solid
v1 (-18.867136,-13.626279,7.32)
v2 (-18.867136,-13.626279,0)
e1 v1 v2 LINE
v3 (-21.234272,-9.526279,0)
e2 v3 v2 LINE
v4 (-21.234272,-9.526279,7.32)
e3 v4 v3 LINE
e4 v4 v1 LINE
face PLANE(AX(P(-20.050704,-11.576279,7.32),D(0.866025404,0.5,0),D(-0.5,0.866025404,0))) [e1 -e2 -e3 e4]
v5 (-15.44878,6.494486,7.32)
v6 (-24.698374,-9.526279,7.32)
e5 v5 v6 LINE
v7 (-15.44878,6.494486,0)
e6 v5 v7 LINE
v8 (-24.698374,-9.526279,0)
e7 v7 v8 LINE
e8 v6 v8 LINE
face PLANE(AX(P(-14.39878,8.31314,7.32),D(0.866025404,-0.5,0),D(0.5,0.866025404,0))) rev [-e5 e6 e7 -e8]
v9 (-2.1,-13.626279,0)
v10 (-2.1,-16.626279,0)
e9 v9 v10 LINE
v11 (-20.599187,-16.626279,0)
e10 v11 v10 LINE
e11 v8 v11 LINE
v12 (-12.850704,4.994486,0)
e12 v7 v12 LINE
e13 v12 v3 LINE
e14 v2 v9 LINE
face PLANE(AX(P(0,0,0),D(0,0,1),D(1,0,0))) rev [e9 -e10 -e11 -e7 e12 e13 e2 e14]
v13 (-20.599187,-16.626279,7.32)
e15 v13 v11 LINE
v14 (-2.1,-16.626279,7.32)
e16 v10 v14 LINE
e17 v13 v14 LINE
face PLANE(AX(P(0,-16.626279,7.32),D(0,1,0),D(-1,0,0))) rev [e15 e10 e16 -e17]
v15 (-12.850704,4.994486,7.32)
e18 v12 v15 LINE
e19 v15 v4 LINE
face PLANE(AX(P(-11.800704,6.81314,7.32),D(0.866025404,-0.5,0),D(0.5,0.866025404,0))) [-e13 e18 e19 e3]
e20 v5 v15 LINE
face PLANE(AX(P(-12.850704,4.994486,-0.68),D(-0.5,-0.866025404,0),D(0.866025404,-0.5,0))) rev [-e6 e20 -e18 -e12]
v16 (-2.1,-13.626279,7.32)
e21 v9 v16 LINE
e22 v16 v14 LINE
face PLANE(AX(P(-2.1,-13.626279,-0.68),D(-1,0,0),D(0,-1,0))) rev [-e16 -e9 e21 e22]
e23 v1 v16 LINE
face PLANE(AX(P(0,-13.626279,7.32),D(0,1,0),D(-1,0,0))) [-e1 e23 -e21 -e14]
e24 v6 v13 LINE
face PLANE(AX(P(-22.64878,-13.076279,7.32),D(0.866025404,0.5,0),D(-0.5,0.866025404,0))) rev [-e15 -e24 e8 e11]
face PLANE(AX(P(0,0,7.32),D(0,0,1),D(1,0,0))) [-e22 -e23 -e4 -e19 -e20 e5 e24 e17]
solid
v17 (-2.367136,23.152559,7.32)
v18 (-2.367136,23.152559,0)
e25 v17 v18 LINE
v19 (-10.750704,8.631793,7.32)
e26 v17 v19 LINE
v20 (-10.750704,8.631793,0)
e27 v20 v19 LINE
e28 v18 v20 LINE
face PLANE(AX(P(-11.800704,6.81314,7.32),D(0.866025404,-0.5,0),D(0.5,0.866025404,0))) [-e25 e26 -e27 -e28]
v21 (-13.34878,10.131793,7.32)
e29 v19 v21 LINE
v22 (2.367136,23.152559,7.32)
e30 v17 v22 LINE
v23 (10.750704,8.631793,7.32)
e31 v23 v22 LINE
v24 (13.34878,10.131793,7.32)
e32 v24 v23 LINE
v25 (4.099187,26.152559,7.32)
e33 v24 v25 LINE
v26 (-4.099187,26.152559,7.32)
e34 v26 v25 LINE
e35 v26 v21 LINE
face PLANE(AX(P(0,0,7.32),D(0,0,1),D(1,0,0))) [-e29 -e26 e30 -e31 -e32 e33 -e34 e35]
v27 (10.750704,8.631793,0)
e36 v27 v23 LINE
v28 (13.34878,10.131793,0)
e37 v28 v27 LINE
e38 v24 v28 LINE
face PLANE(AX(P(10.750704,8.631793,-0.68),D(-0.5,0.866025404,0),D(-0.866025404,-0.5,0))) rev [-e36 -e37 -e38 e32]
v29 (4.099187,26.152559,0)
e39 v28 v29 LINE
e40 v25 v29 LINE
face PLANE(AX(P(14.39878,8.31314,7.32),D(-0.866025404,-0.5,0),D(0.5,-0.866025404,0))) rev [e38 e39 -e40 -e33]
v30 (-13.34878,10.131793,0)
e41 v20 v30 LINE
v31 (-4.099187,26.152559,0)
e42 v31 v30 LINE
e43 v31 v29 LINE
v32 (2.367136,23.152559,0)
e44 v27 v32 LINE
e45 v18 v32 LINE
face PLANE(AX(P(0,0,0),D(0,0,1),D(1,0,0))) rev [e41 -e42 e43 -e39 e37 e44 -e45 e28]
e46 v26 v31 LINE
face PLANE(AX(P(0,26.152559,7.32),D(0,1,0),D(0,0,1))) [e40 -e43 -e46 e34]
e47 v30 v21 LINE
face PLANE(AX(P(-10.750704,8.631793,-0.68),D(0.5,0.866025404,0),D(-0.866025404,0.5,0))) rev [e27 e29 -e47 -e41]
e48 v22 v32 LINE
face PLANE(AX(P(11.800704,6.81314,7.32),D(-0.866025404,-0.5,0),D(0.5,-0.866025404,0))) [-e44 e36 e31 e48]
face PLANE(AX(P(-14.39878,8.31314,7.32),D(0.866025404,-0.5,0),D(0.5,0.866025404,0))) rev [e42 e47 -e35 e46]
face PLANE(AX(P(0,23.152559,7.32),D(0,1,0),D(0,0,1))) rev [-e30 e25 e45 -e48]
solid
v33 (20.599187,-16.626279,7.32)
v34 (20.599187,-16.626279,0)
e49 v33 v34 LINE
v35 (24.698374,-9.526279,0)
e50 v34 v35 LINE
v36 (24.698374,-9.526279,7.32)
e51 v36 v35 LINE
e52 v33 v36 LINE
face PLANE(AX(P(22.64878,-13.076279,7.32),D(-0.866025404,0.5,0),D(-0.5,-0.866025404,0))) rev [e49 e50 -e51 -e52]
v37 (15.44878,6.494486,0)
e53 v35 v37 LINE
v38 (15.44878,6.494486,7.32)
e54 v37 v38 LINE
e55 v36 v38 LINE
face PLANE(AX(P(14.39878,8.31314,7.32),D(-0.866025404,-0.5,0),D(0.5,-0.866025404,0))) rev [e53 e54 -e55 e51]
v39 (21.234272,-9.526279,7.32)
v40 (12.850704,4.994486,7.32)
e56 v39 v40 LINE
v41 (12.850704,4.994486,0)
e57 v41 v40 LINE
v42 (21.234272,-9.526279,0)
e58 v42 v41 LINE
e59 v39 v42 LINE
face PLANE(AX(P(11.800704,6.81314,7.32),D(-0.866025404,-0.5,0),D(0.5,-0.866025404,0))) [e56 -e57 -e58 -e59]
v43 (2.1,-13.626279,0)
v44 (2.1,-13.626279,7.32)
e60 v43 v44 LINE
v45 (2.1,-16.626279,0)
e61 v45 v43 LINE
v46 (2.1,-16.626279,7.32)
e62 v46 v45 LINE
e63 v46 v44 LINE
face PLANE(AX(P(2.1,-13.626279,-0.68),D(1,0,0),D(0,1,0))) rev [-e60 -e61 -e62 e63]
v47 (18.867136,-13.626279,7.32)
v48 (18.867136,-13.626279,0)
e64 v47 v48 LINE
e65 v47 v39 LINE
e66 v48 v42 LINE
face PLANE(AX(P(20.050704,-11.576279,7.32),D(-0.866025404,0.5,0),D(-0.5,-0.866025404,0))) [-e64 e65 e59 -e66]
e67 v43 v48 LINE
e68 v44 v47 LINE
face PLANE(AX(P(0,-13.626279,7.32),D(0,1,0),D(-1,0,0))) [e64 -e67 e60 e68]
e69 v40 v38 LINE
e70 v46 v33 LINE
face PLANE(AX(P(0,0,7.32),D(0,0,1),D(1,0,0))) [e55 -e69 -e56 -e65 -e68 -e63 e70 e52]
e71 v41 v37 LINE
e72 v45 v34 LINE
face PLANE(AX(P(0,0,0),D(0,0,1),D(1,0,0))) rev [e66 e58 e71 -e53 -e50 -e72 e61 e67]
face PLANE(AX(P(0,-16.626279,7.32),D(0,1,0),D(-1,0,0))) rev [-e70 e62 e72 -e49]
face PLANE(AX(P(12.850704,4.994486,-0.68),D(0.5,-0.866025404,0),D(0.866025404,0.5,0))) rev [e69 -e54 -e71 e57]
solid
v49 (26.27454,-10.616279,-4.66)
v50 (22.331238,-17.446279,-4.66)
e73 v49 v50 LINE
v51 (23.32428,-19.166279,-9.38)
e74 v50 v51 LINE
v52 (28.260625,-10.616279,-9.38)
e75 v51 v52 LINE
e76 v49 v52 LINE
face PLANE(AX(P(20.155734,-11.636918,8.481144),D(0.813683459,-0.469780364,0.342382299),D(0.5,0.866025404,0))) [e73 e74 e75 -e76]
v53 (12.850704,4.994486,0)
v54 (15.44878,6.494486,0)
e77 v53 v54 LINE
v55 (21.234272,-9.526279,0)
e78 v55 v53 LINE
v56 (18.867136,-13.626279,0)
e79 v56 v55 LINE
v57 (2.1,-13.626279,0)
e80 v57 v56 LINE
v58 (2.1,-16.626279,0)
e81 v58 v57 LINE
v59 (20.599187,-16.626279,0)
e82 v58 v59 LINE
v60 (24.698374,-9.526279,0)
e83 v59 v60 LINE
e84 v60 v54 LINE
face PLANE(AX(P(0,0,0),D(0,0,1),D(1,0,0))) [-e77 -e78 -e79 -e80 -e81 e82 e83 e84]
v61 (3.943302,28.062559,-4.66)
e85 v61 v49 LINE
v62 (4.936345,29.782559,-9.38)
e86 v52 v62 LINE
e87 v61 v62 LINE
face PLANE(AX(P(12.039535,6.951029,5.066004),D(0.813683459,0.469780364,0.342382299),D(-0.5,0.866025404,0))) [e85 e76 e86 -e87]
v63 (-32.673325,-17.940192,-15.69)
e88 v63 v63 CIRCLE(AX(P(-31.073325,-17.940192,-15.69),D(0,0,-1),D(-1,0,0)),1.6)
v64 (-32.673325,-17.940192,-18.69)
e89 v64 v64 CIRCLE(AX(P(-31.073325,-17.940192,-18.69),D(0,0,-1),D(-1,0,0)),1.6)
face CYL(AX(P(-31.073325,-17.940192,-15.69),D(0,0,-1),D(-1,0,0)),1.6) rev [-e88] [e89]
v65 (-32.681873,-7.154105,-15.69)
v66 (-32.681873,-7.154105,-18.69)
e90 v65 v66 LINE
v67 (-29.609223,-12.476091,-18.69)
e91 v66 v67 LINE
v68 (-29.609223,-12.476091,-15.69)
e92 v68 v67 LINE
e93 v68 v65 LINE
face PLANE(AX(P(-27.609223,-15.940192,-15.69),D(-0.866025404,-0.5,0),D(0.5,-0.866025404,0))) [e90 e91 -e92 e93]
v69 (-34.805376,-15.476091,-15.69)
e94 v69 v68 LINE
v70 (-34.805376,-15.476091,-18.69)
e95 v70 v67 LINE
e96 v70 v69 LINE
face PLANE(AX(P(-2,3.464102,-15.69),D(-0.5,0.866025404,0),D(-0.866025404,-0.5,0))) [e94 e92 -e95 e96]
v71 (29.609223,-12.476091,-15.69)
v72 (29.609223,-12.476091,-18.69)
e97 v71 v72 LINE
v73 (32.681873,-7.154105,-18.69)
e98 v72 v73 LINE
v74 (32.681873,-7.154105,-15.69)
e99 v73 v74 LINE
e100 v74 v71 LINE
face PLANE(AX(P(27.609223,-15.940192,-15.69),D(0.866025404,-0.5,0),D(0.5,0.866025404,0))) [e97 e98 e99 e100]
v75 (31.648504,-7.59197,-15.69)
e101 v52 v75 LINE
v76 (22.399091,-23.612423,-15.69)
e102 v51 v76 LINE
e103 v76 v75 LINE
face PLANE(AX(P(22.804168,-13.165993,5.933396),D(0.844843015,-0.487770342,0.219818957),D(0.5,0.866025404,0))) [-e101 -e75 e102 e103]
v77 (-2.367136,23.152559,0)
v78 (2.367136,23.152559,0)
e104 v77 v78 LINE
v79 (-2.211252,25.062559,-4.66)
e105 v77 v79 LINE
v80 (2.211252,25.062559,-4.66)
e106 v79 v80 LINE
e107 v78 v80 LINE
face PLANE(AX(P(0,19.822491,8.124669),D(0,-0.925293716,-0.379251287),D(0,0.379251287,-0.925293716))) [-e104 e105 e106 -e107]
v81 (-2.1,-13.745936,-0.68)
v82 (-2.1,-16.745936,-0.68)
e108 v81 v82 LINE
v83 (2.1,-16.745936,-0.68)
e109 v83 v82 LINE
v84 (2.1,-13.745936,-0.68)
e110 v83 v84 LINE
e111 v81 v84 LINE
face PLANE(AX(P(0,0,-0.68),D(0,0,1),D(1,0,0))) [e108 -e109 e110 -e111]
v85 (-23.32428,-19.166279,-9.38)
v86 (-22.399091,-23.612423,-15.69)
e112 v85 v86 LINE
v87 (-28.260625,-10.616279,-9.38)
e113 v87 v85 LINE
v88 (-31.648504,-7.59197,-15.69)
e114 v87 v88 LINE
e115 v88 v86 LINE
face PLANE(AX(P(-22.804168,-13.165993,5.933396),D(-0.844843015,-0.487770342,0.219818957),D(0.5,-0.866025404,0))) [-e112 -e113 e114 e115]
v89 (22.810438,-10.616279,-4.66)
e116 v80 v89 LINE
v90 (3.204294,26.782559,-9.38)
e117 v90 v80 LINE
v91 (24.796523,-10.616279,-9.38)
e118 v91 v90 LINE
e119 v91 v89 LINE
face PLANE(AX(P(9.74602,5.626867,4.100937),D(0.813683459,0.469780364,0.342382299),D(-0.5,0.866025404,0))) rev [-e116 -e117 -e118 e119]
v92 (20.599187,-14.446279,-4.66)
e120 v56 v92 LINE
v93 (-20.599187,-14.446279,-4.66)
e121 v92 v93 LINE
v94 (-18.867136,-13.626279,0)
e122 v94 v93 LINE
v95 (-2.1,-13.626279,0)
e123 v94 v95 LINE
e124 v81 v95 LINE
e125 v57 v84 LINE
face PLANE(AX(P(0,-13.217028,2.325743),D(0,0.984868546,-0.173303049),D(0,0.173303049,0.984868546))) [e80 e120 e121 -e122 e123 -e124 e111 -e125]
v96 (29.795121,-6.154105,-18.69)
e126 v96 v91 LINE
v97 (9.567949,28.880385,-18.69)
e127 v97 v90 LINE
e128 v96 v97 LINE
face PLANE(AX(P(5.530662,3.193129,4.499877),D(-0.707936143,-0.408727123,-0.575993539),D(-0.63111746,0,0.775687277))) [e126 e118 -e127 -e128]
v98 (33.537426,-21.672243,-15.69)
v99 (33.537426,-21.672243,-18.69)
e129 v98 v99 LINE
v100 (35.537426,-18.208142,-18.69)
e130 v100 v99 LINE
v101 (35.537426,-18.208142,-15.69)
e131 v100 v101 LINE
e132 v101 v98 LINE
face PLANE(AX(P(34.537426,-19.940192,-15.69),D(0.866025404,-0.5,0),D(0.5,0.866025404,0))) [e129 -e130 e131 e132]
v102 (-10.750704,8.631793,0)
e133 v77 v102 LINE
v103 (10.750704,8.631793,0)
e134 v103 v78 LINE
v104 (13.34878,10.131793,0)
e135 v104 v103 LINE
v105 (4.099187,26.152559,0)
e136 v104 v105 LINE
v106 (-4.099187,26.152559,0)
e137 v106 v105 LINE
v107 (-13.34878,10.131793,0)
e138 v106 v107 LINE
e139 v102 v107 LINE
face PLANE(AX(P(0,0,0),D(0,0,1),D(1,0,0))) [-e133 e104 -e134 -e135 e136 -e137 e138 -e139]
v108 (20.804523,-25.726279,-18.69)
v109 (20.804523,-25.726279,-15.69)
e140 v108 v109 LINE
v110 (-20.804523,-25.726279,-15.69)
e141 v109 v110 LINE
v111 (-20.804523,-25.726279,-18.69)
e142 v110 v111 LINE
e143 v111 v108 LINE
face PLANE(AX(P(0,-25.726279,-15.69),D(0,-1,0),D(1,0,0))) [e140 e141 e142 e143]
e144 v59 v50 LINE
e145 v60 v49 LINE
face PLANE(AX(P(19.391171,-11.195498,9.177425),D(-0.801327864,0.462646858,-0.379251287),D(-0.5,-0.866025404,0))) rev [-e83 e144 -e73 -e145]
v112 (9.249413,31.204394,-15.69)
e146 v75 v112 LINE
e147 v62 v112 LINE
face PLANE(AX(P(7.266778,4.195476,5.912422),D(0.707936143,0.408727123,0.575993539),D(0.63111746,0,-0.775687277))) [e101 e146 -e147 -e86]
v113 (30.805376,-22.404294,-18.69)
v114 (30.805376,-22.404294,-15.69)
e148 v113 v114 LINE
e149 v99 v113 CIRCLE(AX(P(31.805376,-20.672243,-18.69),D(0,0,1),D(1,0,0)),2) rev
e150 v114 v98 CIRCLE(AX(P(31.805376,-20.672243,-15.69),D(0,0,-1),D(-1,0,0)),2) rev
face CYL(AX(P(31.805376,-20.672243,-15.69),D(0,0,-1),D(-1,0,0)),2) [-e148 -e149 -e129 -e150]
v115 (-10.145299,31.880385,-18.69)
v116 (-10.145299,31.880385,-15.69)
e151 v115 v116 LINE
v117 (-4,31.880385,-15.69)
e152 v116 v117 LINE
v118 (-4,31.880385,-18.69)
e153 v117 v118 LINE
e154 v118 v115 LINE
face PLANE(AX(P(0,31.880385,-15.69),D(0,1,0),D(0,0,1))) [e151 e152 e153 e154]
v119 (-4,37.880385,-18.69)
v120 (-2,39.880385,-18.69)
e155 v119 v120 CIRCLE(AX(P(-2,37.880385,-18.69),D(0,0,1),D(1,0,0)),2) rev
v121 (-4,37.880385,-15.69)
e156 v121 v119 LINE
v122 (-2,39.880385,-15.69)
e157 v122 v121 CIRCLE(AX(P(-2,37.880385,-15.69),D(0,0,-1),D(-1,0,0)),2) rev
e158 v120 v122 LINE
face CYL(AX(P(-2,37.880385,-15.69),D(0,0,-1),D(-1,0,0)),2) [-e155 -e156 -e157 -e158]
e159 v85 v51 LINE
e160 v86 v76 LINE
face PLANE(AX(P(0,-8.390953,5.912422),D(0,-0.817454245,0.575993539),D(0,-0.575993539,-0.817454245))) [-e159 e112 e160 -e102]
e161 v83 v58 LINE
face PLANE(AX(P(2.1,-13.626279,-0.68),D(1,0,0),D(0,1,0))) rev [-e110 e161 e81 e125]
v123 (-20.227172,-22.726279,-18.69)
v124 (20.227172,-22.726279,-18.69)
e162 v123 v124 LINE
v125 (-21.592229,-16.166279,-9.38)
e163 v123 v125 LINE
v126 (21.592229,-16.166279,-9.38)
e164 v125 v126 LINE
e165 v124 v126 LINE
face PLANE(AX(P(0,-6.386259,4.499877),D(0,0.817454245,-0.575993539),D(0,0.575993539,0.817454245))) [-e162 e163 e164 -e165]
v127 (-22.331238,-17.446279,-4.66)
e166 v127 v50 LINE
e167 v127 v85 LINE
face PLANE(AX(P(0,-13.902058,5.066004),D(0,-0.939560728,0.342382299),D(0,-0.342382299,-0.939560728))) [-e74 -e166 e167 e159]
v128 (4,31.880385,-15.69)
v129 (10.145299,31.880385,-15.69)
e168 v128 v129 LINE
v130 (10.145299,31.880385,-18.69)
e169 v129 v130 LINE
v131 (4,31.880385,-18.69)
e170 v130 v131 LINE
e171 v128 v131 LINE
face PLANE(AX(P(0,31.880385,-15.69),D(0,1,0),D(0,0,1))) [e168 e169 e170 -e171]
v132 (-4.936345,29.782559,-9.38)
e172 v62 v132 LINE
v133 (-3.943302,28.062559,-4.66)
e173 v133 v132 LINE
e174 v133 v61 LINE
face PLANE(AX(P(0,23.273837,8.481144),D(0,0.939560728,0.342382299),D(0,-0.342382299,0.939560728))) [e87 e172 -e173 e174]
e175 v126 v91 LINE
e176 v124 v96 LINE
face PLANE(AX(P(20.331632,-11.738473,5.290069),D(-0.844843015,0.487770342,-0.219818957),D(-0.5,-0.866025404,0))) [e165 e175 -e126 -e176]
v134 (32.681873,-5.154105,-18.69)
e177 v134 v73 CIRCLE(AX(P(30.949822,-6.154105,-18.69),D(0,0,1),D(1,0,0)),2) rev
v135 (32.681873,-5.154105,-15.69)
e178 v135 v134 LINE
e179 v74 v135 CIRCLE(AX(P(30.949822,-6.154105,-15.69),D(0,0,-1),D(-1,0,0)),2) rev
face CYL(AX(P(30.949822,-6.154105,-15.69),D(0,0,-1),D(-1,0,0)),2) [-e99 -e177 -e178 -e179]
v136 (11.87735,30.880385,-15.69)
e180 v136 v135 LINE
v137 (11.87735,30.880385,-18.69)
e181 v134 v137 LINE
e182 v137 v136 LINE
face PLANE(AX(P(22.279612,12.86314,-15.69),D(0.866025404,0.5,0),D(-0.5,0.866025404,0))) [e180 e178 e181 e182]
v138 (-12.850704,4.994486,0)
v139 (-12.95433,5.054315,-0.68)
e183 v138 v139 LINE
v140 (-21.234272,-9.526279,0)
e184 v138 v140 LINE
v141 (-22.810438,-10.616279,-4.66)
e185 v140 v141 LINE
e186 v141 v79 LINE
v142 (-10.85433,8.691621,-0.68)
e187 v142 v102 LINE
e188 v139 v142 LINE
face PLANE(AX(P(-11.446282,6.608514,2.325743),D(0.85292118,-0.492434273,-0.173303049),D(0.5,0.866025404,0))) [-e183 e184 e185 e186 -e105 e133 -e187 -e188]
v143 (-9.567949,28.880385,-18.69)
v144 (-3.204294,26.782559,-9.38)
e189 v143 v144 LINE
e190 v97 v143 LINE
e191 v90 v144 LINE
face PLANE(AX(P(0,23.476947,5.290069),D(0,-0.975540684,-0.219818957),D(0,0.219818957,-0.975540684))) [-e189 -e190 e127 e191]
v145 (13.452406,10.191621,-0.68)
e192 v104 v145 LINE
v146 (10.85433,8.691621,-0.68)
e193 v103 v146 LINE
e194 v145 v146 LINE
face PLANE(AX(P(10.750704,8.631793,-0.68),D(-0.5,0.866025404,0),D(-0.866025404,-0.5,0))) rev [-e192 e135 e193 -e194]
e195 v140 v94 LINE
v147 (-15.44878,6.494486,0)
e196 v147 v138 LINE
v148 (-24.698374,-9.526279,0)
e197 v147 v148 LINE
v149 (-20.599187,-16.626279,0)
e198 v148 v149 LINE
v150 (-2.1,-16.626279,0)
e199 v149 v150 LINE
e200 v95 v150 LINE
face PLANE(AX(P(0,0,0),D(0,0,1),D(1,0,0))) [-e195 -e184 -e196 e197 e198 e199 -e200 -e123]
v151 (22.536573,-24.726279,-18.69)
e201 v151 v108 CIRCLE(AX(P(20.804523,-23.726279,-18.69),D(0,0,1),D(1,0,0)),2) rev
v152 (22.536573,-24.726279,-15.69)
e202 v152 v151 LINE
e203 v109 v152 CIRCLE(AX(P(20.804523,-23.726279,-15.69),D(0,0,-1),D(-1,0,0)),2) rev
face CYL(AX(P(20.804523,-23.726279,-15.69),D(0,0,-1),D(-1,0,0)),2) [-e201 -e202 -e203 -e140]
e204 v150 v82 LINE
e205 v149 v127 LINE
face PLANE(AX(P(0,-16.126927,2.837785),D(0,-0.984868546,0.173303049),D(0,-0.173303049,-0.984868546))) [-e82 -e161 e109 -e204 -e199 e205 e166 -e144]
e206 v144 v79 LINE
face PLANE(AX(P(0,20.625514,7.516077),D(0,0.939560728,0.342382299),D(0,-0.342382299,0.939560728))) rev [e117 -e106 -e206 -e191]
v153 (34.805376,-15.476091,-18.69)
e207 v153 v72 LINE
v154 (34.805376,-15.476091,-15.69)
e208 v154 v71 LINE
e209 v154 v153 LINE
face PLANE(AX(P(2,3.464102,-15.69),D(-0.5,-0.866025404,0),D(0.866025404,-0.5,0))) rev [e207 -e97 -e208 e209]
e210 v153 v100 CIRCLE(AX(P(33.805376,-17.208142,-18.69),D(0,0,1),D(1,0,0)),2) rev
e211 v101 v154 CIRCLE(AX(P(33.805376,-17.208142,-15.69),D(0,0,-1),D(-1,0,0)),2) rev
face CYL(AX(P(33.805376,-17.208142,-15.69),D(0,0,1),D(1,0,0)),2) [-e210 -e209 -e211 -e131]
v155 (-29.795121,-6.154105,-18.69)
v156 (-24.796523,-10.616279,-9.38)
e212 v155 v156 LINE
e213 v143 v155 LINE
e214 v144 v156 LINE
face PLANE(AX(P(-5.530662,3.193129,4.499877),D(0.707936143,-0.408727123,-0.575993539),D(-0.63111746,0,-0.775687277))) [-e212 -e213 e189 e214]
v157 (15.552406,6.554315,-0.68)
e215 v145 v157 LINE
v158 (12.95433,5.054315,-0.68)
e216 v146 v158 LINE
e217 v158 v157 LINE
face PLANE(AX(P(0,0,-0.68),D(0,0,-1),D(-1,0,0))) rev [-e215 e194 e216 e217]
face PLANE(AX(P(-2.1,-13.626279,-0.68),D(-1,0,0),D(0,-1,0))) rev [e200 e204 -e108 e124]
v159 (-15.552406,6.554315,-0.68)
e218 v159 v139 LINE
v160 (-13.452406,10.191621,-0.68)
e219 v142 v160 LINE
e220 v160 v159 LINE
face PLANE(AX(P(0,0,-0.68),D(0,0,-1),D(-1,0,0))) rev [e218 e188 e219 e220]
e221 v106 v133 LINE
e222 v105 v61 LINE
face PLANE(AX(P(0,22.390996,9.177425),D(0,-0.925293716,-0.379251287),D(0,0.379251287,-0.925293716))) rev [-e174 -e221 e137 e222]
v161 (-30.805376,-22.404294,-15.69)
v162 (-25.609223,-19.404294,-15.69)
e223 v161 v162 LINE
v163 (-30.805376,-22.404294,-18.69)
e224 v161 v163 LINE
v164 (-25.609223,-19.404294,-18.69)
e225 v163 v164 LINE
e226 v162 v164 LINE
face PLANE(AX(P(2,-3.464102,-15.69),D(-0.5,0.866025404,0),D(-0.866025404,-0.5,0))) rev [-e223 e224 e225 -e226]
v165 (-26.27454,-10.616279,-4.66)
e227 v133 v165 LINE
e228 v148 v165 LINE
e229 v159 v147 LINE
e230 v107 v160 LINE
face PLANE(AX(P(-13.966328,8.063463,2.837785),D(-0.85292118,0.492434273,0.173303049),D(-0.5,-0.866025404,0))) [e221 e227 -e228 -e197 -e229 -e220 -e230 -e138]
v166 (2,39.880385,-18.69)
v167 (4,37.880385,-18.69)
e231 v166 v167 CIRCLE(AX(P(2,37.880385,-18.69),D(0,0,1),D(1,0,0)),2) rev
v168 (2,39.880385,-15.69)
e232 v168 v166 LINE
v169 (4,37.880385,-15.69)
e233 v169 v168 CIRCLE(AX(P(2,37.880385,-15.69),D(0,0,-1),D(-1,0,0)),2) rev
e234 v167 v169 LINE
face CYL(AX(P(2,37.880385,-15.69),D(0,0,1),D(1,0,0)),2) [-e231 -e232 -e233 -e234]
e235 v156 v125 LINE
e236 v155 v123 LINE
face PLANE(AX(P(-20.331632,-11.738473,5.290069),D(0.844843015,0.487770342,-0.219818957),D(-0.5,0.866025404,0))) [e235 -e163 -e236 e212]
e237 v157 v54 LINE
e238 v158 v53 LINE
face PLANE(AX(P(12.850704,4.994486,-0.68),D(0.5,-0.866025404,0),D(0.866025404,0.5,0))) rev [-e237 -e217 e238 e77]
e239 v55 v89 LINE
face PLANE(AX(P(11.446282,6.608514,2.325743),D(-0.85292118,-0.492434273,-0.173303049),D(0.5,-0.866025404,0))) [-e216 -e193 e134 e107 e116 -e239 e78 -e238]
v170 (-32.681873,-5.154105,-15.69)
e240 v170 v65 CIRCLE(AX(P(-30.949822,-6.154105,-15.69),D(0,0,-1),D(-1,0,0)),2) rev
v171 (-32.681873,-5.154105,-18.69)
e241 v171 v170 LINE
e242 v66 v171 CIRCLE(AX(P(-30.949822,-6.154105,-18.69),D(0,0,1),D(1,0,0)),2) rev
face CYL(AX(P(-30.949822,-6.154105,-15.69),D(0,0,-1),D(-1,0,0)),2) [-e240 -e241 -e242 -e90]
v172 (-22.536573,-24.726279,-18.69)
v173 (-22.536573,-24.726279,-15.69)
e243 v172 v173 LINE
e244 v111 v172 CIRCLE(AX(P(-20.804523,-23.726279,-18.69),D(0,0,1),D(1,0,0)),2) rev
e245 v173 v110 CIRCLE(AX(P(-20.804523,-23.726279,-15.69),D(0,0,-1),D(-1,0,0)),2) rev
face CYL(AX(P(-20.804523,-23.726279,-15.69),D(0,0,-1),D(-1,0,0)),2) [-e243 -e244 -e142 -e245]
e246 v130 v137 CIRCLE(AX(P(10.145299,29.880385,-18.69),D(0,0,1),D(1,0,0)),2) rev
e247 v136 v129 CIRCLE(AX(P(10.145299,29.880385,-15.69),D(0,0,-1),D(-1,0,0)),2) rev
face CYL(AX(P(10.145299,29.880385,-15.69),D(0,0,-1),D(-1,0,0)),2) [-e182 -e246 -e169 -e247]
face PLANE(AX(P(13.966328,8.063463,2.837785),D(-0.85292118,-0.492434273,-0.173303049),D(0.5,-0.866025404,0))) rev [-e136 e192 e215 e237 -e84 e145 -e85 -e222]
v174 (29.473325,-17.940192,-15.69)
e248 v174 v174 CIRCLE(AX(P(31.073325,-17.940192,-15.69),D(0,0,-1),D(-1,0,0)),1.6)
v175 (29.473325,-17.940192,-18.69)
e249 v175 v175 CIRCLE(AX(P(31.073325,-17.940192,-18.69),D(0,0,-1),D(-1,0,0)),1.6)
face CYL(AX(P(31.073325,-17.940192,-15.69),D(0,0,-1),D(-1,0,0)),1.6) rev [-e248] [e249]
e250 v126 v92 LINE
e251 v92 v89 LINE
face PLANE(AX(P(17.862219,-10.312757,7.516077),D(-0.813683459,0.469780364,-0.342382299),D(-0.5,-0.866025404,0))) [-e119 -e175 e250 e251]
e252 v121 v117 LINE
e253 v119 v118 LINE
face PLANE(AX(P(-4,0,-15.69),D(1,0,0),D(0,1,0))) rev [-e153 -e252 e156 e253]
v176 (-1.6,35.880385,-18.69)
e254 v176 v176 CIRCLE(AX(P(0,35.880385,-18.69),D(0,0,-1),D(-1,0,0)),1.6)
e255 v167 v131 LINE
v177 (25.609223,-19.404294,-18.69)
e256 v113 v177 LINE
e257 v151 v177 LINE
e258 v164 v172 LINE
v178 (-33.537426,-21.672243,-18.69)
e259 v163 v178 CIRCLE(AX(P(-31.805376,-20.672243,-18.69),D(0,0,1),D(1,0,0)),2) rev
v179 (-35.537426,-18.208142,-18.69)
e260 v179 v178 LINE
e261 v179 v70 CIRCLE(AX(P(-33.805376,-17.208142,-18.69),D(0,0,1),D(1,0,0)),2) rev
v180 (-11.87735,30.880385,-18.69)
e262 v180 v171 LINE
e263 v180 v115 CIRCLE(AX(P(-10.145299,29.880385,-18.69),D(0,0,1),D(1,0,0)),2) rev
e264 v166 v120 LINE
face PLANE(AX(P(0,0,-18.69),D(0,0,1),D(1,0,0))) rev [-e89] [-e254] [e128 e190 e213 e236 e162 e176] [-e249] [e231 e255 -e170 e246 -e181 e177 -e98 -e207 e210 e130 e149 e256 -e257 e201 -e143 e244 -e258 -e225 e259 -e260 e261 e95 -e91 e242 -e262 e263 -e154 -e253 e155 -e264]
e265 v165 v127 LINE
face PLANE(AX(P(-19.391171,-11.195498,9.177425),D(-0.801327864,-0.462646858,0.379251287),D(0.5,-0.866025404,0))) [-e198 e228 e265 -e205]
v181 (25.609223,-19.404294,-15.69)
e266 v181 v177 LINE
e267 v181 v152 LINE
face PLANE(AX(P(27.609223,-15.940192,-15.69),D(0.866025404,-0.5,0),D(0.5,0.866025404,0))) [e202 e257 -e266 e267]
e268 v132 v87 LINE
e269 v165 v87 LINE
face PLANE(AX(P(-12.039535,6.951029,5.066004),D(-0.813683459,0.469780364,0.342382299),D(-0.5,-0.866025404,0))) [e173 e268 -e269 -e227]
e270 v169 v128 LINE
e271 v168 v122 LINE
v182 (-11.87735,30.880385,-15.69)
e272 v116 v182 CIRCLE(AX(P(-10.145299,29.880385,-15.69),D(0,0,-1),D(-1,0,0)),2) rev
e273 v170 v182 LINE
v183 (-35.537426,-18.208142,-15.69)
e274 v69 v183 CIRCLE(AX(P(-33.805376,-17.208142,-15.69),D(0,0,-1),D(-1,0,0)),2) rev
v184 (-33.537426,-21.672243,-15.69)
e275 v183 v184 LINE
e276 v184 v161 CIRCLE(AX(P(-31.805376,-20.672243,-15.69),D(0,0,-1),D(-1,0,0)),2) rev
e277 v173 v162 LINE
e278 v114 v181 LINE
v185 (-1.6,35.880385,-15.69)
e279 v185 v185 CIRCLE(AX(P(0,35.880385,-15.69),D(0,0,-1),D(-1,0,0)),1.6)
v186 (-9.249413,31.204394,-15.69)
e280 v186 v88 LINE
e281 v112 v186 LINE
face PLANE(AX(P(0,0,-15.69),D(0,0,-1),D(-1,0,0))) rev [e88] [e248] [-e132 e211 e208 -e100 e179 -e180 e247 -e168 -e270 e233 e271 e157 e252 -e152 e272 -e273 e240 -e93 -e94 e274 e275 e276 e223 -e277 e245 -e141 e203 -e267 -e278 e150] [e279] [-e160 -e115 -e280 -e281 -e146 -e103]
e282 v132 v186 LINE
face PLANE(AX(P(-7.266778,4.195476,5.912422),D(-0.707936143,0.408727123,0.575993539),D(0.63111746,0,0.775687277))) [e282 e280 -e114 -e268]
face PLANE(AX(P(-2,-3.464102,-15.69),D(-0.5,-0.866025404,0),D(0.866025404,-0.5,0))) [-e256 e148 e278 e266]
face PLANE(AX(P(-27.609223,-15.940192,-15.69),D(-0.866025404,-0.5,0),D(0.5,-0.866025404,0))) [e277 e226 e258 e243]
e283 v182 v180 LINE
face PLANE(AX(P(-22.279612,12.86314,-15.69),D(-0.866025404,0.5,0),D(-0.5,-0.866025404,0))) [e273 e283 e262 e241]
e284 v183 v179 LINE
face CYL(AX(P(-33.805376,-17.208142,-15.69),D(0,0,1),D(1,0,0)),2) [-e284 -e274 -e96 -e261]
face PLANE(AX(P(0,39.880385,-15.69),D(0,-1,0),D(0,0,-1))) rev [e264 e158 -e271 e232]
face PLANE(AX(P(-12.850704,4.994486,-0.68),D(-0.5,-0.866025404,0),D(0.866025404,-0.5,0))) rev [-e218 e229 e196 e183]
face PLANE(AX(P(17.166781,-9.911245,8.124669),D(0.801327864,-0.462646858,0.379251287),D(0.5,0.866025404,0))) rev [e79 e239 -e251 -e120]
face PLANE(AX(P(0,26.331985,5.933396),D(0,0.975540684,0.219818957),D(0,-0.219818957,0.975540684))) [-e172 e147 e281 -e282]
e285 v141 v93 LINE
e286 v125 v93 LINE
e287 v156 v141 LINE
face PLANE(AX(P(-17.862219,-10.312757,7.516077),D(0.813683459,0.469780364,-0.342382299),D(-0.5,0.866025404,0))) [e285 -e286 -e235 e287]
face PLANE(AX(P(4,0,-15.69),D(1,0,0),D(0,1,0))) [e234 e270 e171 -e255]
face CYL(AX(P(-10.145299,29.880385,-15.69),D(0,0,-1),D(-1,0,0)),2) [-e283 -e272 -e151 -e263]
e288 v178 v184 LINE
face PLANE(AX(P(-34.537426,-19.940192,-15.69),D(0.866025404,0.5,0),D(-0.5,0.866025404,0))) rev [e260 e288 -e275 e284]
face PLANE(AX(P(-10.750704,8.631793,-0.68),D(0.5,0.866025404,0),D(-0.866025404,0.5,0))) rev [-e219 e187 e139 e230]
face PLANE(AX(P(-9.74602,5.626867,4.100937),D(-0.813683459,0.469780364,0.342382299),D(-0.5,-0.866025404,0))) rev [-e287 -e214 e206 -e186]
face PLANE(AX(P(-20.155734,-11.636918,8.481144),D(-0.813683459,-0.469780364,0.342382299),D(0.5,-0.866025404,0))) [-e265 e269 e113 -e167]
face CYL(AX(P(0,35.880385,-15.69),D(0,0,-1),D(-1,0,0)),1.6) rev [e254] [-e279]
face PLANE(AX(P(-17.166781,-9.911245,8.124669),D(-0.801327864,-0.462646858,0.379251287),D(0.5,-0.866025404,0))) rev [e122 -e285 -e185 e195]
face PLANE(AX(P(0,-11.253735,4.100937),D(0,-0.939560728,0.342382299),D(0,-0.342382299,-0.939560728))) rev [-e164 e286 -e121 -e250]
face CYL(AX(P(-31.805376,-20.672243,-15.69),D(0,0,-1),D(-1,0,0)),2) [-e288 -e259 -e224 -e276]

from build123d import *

# Parameters (mm, degrees)
BOSS_EXTRUDE1_DEPTH     = 7.32
BOSS_EXTRUDE6_START     = -3
BOSS_EXTRUDE6_OUTLINE_R = 1.6
BOSS_EXTRUDE6_DEPTH     = 3
FILLET2_R               = 2
SKETCH16_W              = 4.2
SKETCH16_H              = 15
CUT_EXTRUDE1_DEPTH      = 8


# Read off the part's stored shape, not the designer's step: Boss-Extrude6
with BuildPart() as part:
    # Sketch1 → Boss-Extrude1 (new body)
    with BuildSketch(Plane.XY):
        Polygon((-20.599186911, -16.626279442), (20.599186911, -16.626279442), (24.698373822, -9.526279442), (4.099186911, 26.152558883), (-4.099186911, 26.152558883), (-24.698373822, -9.526279442), align=None)
        Polygon((18.867136104, -13.626279442), (21.234272207, -9.526279442), (2.367136104, 23.152558883), (-2.367136104, 23.152558883), (-21.234272207, -9.526279442), (-18.867136104, -13.626279442), align=None, mode=Mode.SUBTRACT)
    extrude(amount=BOSS_EXTRUDE1_DEPTH)


with BuildPart() as body_2:
    # Sketch1<14> → Loft3 section 0
    with BuildSketch(Plane.XY):
        with BuildLine():
            Line((-4.099186911, 26.152558883), (-24.698373822, -9.526279442))
            Line((-24.698373822, -9.526279442), (-20.599186911, -16.626279442))
            Line((-20.599186911, -16.626279442), (20.599186911, -16.626279442))
            Line((20.599186911, -16.626279442), (24.698373822, -9.526279442))
            Line((24.698373822, -9.526279442), (4.099186911, 26.152558883))
            Line((4.099186911, 26.152558883), (-4.099186911, 26.152558883))
        make_face()
    # Sketch5 → Loft3 section 1
    with BuildSketch(Plane.XY.offset(-4.66)):
        with BuildLine():
            Line((-3.943302339, 28.062558883), (-26.274540057, -10.616279442))
            Line((-26.274540057, -10.616279442), (-22.331237719, -17.446279442))
            Line((-22.331237719, -17.446279442), (22.331237719, -17.446279442))
            Line((22.331237719, -17.446279442), (26.274540057, -10.616279442))
            Line((26.274540057, -10.616279442), (3.943302339, 28.062558883))
            Line((3.943302339, 28.062558883), (-3.943302339, 28.062558883))
        make_face()
    loft()

    # Sketch5<46> → Loft4 section 0
    with BuildSketch(Plane.XY.offset(-4.66)):
        with BuildLine():
            Line((-3.943302339, 28.062558883), (-26.274540057, -10.616279442))
            Line((-26.274540057, -10.616279442), (-22.331237719, -17.446279442))
            Line((-22.331237719, -17.446279442), (22.331237719, -17.446279442))
            Line((22.331237719, -17.446279442), (26.274540057, -10.616279442))
            Line((26.274540057, -10.616279442), (3.943302339, 28.062558883))
            Line((3.943302339, 28.062558883), (-3.943302339, 28.062558883))
        make_face()
    # Sketch13 → Loft4 section 1
    with BuildSketch(Plane.XY.offset(-9.38)):
        with BuildLine():
            Line((-4.936344802, 29.782558883), (-28.260624983, -10.616279442))
            Line((-28.260624983, -10.616279442), (-23.324280182, -19.166279442))
            Line((-23.324280182, -19.166279442), (23.324280182, -19.166279442))
            Line((23.324280182, -19.166279442), (28.260624983, -10.616279442))
            Line((28.260624983, -10.616279442), (4.936344802, 29.782558883))
            Line((4.936344802, 29.782558883), (-4.936344802, 29.782558883))
        make_face()
    loft()

    # Sketch13<4> → Loft5 section 0
    with BuildSketch(Plane.XY.offset(-9.38)):
        with BuildLine():
            Line((-4.936344802, 29.782558883), (-28.260624983, -10.616279442))
            Line((-28.260624983, -10.616279442), (-23.324280182, -19.166279442))
            Line((-23.324280182, -19.166279442), (23.324280182, -19.166279442))
            Line((23.324280182, -19.166279442), (28.260624983, -10.616279442))
            Line((28.260624983, -10.616279442), (4.936344802, 29.782558883))
            Line((4.936344802, 29.782558883), (-4.936344802, 29.782558883))
        make_face()
    # Sketch14 → Loft5 section 1
    with BuildSketch(Plane.XY.offset(-18.69)):
        with BuildLine():
            Line((11.3, 31.880384758), (-11.3, 31.880384758))
            Line((-11.3, 31.880384758), (-33.259223083, -6.154105316))
            Line((-33.259223083, -6.154105316), (-21.959223083, -25.726279442))
            Line((-21.959223083, -25.726279442), (21.959223083, -25.726279442))
            Line((21.959223083, -25.726279442), (33.259223083, -6.154105316))
            Line((33.259223083, -6.154105316), (11.3, 31.880384758))
        make_face()
    loft()

    # Sketch1<15> → Cut-Loft1 section 0
    with BuildSketch(Plane.XY):
        with BuildLine():
            Line((-2.367136104, 23.152558883), (2.367136104, 23.152558883))
            Line((2.367136104, 23.152558883), (21.234272207, -9.526279442))
            Line((21.234272207, -9.526279442), (18.867136104, -13.626279442))
            Line((18.867136104, -13.626279442), (-18.867136104, -13.626279442))
            Line((-18.867136104, -13.626279442), (-21.234272207, -9.526279442))
            Line((-21.234272207, -9.526279442), (-2.367136104, 23.152558883))
        make_face()
    # Sketch5<47> → Cut-Loft1 section 1
    with BuildSketch(Plane.XY.offset(-4.66)):
        with BuildLine():
            Line((2.211251531, 25.062558883), (22.810438442, -10.616279442))
            Line((22.810438442, -10.616279442), (20.599186911, -14.446279442))
            Line((20.599186911, -14.446279442), (-20.599186911, -14.446279442))
            Line((-20.599186911, -14.446279442), (-22.810438442, -10.616279442))
            Line((-22.810438442, -10.616279442), (-2.211251531, 25.062558883))
            Line((-2.211251531, 25.062558883), (2.211251531, 25.062558883))
        make_face()
    loft(mode=Mode.SUBTRACT)

    # Sketch14<5> → Cut-Loft2 section 0
    with BuildSketch(Plane.XY.offset(-18.69)):
        with BuildLine():
            Line((29.795121467, -6.154105316), (9.567949192, 28.880384758))
            Line((9.567949192, 28.880384758), (-9.567949192, 28.880384758))
            Line((-9.567949192, 28.880384758), (-29.795121467, -6.154105316))
            Line((-29.795121467, -6.154105316), (-20.227172275, -22.726279442))
            Line((-20.227172275, -22.726279442), (20.227172275, -22.726279442))
            Line((20.227172275, -22.726279442), (29.795121467, -6.154105316))
        make_face()
    # Sketch13<5> → Cut-Loft2 section 1
    with BuildSketch(Plane.XY.offset(-9.38)):
        with BuildLine():
            Line((-24.796523368, -10.616279442), (-21.592229374, -16.166279442))
            Line((-21.592229374, -16.166279442), (21.592229374, -16.166279442))
            Line((21.592229374, -16.166279442), (24.796523368, -10.616279442))
            Line((24.796523368, -10.616279442), (3.204293994, 26.782558883))
            Line((3.204293994, 26.782558883), (-3.204293994, 26.782558883))
            Line((-3.204293994, 26.782558883), (-24.796523368, -10.616279442))
        make_face()
    loft(mode=Mode.SUBTRACT)

    # Sketch13<6> → Cut-Loft3 section 0
    with BuildSketch(Plane.XY.offset(-9.38)):
        with BuildLine():
            Line((-24.796523368, -10.616279442), (-21.592229374, -16.166279442))
            Line((-21.592229374, -16.166279442), (21.592229374, -16.166279442))
            Line((21.592229374, -16.166279442), (24.796523368, -10.616279442))
            Line((24.796523368, -10.616279442), (3.204293994, 26.782558883))
            Line((3.204293994, 26.782558883), (-3.204293994, 26.782558883))
            Line((-3.204293994, 26.782558883), (-24.796523368, -10.616279442))
        make_face()
    # Sketch5<48> → Cut-Loft3 section 1
    with BuildSketch(Plane.XY.offset(-4.66)):
        with BuildLine():
            Line((2.211251531, 25.062558883), (22.810438442, -10.616279442))
            Line((22.810438442, -10.616279442), (20.599186911, -14.446279442))
            Line((20.599186911, -14.446279442), (-20.599186911, -14.446279442))
            Line((-20.599186911, -14.446279442), (-22.810438442, -10.616279442))
            Line((-22.810438442, -10.616279442), (-2.211251531, 25.062558883))
            Line((-2.211251531, 25.062558883), (2.211251531, 25.062558883))
        make_face()
    loft(mode=Mode.SUBTRACT)

    # Boss-Extrude6 outline → Boss-Extrude6 (add)
    with BuildSketch(Plane(origin=(0, 0, -18.69), x_dir=(-1, 0, 0), z_dir=(0, 0, -1)).offset(BOSS_EXTRUDE6_START)):
        Polygon((36.537426313, -16.476090764), (29.609223083, -12.476090764), (33.259223083, -6.154105316), (11.3, 31.880384758), (4, 31.880384758), (4, 39.880384758), (-4, 39.880384758), (-4, 31.880384758), (-11.3, 31.880384758), (-33.259223083, -6.154105316), (-29.609223083, -12.476090764), (-36.537426313, -16.476090764), (-32.537426313, -23.404293994), (-25.609223083, -19.404293994), (-21.959223083, -25.726279442), (21.959223083, -25.726279442), (25.609223083, -19.404293994), (32.537426313, -23.404293994), align=None)
        with Locations((31.073324698, -17.940192379)):
            Circle(BOSS_EXTRUDE6_OUTLINE_R, mode=Mode.SUBTRACT)
        Polygon((-29.795121467, -6.154105316), (-9.567949192, 28.880384758), (9.567949192, 28.880384758), (29.795121467, -6.154105316), (20.227172275, -22.726279442), (-20.227172275, -22.726279442), align=None, mode=Mode.SUBTRACT)
        with Locations((-31.073324698, -17.940192379)):
            Circle(BOSS_EXTRUDE6_OUTLINE_R, mode=Mode.SUBTRACT)
        with Locations((0, 35.880384758)):
            Circle(BOSS_EXTRUDE6_OUTLINE_R, mode=Mode.SUBTRACT)
    extrude(amount=BOSS_EXTRUDE6_DEPTH)

    # Fillet2
    fillet2_edges = [body_2.edges().sort_by_distance(p)[0] for p in [
        (-11.3, 31.880384758, -17.19),
        (-33.259223083, -6.154105316, -17.19),
        (-36.537426313, -16.476090764, -17.19),
        (-32.537426313, -23.404293994, -17.19),
        (-21.959223083, -25.726279442, -17.19),
        (21.959223083, -25.726279442, -17.19),
        (32.537426313, -23.404293994, -17.19),
        (36.537426313, -16.476090764, -17.19),
        (33.259223083, -6.154105316, -17.19),
        (11.3, 31.880384758, -17.19),
        (4, 39.880384758, -17.19),
        (-4, 39.880384758, -17.19),
    ]]
    fillet(fillet2_edges, radius=FILLET2_R)


with BuildPart() as cut_extrude1_tool:
    # Sketch16 → Cut-Extrude1 (new body)
    with BuildSketch(Plane.XY.offset(7.32)):
        with Locations((0, -21.126279442)):
            Rectangle(SKETCH16_W, SKETCH16_H)
        Polygon((-12.850704156, 4.994486373), (-25.841085212, 12.494486373), (-23.741085212, 16.131793069), (-10.750704156, 8.631793069), align=None)
        Polygon((10.750704156, 8.631793069), (23.741085212, 16.131793069), (25.841085212, 12.494486373), (12.850704156, 4.994486373), align=None)
    extrude(amount=-CUT_EXTRUDE1_DEPTH)


with BuildPart() as part_1:
    add(part.part)

    # Cut-Extrude1: cut by cut_extrude1_tool
    add(cut_extrude1_tool.part, mode=Mode.SUBTRACT)


with BuildPart() as body_2_1:
    add(body_2.part)

    # Cut-Extrude1: cut by cut_extrude1_tool
    add(cut_extrude1_tool.part, mode=Mode.SUBTRACT)


solid = Compound([part_1.part, body_2_1.part])
